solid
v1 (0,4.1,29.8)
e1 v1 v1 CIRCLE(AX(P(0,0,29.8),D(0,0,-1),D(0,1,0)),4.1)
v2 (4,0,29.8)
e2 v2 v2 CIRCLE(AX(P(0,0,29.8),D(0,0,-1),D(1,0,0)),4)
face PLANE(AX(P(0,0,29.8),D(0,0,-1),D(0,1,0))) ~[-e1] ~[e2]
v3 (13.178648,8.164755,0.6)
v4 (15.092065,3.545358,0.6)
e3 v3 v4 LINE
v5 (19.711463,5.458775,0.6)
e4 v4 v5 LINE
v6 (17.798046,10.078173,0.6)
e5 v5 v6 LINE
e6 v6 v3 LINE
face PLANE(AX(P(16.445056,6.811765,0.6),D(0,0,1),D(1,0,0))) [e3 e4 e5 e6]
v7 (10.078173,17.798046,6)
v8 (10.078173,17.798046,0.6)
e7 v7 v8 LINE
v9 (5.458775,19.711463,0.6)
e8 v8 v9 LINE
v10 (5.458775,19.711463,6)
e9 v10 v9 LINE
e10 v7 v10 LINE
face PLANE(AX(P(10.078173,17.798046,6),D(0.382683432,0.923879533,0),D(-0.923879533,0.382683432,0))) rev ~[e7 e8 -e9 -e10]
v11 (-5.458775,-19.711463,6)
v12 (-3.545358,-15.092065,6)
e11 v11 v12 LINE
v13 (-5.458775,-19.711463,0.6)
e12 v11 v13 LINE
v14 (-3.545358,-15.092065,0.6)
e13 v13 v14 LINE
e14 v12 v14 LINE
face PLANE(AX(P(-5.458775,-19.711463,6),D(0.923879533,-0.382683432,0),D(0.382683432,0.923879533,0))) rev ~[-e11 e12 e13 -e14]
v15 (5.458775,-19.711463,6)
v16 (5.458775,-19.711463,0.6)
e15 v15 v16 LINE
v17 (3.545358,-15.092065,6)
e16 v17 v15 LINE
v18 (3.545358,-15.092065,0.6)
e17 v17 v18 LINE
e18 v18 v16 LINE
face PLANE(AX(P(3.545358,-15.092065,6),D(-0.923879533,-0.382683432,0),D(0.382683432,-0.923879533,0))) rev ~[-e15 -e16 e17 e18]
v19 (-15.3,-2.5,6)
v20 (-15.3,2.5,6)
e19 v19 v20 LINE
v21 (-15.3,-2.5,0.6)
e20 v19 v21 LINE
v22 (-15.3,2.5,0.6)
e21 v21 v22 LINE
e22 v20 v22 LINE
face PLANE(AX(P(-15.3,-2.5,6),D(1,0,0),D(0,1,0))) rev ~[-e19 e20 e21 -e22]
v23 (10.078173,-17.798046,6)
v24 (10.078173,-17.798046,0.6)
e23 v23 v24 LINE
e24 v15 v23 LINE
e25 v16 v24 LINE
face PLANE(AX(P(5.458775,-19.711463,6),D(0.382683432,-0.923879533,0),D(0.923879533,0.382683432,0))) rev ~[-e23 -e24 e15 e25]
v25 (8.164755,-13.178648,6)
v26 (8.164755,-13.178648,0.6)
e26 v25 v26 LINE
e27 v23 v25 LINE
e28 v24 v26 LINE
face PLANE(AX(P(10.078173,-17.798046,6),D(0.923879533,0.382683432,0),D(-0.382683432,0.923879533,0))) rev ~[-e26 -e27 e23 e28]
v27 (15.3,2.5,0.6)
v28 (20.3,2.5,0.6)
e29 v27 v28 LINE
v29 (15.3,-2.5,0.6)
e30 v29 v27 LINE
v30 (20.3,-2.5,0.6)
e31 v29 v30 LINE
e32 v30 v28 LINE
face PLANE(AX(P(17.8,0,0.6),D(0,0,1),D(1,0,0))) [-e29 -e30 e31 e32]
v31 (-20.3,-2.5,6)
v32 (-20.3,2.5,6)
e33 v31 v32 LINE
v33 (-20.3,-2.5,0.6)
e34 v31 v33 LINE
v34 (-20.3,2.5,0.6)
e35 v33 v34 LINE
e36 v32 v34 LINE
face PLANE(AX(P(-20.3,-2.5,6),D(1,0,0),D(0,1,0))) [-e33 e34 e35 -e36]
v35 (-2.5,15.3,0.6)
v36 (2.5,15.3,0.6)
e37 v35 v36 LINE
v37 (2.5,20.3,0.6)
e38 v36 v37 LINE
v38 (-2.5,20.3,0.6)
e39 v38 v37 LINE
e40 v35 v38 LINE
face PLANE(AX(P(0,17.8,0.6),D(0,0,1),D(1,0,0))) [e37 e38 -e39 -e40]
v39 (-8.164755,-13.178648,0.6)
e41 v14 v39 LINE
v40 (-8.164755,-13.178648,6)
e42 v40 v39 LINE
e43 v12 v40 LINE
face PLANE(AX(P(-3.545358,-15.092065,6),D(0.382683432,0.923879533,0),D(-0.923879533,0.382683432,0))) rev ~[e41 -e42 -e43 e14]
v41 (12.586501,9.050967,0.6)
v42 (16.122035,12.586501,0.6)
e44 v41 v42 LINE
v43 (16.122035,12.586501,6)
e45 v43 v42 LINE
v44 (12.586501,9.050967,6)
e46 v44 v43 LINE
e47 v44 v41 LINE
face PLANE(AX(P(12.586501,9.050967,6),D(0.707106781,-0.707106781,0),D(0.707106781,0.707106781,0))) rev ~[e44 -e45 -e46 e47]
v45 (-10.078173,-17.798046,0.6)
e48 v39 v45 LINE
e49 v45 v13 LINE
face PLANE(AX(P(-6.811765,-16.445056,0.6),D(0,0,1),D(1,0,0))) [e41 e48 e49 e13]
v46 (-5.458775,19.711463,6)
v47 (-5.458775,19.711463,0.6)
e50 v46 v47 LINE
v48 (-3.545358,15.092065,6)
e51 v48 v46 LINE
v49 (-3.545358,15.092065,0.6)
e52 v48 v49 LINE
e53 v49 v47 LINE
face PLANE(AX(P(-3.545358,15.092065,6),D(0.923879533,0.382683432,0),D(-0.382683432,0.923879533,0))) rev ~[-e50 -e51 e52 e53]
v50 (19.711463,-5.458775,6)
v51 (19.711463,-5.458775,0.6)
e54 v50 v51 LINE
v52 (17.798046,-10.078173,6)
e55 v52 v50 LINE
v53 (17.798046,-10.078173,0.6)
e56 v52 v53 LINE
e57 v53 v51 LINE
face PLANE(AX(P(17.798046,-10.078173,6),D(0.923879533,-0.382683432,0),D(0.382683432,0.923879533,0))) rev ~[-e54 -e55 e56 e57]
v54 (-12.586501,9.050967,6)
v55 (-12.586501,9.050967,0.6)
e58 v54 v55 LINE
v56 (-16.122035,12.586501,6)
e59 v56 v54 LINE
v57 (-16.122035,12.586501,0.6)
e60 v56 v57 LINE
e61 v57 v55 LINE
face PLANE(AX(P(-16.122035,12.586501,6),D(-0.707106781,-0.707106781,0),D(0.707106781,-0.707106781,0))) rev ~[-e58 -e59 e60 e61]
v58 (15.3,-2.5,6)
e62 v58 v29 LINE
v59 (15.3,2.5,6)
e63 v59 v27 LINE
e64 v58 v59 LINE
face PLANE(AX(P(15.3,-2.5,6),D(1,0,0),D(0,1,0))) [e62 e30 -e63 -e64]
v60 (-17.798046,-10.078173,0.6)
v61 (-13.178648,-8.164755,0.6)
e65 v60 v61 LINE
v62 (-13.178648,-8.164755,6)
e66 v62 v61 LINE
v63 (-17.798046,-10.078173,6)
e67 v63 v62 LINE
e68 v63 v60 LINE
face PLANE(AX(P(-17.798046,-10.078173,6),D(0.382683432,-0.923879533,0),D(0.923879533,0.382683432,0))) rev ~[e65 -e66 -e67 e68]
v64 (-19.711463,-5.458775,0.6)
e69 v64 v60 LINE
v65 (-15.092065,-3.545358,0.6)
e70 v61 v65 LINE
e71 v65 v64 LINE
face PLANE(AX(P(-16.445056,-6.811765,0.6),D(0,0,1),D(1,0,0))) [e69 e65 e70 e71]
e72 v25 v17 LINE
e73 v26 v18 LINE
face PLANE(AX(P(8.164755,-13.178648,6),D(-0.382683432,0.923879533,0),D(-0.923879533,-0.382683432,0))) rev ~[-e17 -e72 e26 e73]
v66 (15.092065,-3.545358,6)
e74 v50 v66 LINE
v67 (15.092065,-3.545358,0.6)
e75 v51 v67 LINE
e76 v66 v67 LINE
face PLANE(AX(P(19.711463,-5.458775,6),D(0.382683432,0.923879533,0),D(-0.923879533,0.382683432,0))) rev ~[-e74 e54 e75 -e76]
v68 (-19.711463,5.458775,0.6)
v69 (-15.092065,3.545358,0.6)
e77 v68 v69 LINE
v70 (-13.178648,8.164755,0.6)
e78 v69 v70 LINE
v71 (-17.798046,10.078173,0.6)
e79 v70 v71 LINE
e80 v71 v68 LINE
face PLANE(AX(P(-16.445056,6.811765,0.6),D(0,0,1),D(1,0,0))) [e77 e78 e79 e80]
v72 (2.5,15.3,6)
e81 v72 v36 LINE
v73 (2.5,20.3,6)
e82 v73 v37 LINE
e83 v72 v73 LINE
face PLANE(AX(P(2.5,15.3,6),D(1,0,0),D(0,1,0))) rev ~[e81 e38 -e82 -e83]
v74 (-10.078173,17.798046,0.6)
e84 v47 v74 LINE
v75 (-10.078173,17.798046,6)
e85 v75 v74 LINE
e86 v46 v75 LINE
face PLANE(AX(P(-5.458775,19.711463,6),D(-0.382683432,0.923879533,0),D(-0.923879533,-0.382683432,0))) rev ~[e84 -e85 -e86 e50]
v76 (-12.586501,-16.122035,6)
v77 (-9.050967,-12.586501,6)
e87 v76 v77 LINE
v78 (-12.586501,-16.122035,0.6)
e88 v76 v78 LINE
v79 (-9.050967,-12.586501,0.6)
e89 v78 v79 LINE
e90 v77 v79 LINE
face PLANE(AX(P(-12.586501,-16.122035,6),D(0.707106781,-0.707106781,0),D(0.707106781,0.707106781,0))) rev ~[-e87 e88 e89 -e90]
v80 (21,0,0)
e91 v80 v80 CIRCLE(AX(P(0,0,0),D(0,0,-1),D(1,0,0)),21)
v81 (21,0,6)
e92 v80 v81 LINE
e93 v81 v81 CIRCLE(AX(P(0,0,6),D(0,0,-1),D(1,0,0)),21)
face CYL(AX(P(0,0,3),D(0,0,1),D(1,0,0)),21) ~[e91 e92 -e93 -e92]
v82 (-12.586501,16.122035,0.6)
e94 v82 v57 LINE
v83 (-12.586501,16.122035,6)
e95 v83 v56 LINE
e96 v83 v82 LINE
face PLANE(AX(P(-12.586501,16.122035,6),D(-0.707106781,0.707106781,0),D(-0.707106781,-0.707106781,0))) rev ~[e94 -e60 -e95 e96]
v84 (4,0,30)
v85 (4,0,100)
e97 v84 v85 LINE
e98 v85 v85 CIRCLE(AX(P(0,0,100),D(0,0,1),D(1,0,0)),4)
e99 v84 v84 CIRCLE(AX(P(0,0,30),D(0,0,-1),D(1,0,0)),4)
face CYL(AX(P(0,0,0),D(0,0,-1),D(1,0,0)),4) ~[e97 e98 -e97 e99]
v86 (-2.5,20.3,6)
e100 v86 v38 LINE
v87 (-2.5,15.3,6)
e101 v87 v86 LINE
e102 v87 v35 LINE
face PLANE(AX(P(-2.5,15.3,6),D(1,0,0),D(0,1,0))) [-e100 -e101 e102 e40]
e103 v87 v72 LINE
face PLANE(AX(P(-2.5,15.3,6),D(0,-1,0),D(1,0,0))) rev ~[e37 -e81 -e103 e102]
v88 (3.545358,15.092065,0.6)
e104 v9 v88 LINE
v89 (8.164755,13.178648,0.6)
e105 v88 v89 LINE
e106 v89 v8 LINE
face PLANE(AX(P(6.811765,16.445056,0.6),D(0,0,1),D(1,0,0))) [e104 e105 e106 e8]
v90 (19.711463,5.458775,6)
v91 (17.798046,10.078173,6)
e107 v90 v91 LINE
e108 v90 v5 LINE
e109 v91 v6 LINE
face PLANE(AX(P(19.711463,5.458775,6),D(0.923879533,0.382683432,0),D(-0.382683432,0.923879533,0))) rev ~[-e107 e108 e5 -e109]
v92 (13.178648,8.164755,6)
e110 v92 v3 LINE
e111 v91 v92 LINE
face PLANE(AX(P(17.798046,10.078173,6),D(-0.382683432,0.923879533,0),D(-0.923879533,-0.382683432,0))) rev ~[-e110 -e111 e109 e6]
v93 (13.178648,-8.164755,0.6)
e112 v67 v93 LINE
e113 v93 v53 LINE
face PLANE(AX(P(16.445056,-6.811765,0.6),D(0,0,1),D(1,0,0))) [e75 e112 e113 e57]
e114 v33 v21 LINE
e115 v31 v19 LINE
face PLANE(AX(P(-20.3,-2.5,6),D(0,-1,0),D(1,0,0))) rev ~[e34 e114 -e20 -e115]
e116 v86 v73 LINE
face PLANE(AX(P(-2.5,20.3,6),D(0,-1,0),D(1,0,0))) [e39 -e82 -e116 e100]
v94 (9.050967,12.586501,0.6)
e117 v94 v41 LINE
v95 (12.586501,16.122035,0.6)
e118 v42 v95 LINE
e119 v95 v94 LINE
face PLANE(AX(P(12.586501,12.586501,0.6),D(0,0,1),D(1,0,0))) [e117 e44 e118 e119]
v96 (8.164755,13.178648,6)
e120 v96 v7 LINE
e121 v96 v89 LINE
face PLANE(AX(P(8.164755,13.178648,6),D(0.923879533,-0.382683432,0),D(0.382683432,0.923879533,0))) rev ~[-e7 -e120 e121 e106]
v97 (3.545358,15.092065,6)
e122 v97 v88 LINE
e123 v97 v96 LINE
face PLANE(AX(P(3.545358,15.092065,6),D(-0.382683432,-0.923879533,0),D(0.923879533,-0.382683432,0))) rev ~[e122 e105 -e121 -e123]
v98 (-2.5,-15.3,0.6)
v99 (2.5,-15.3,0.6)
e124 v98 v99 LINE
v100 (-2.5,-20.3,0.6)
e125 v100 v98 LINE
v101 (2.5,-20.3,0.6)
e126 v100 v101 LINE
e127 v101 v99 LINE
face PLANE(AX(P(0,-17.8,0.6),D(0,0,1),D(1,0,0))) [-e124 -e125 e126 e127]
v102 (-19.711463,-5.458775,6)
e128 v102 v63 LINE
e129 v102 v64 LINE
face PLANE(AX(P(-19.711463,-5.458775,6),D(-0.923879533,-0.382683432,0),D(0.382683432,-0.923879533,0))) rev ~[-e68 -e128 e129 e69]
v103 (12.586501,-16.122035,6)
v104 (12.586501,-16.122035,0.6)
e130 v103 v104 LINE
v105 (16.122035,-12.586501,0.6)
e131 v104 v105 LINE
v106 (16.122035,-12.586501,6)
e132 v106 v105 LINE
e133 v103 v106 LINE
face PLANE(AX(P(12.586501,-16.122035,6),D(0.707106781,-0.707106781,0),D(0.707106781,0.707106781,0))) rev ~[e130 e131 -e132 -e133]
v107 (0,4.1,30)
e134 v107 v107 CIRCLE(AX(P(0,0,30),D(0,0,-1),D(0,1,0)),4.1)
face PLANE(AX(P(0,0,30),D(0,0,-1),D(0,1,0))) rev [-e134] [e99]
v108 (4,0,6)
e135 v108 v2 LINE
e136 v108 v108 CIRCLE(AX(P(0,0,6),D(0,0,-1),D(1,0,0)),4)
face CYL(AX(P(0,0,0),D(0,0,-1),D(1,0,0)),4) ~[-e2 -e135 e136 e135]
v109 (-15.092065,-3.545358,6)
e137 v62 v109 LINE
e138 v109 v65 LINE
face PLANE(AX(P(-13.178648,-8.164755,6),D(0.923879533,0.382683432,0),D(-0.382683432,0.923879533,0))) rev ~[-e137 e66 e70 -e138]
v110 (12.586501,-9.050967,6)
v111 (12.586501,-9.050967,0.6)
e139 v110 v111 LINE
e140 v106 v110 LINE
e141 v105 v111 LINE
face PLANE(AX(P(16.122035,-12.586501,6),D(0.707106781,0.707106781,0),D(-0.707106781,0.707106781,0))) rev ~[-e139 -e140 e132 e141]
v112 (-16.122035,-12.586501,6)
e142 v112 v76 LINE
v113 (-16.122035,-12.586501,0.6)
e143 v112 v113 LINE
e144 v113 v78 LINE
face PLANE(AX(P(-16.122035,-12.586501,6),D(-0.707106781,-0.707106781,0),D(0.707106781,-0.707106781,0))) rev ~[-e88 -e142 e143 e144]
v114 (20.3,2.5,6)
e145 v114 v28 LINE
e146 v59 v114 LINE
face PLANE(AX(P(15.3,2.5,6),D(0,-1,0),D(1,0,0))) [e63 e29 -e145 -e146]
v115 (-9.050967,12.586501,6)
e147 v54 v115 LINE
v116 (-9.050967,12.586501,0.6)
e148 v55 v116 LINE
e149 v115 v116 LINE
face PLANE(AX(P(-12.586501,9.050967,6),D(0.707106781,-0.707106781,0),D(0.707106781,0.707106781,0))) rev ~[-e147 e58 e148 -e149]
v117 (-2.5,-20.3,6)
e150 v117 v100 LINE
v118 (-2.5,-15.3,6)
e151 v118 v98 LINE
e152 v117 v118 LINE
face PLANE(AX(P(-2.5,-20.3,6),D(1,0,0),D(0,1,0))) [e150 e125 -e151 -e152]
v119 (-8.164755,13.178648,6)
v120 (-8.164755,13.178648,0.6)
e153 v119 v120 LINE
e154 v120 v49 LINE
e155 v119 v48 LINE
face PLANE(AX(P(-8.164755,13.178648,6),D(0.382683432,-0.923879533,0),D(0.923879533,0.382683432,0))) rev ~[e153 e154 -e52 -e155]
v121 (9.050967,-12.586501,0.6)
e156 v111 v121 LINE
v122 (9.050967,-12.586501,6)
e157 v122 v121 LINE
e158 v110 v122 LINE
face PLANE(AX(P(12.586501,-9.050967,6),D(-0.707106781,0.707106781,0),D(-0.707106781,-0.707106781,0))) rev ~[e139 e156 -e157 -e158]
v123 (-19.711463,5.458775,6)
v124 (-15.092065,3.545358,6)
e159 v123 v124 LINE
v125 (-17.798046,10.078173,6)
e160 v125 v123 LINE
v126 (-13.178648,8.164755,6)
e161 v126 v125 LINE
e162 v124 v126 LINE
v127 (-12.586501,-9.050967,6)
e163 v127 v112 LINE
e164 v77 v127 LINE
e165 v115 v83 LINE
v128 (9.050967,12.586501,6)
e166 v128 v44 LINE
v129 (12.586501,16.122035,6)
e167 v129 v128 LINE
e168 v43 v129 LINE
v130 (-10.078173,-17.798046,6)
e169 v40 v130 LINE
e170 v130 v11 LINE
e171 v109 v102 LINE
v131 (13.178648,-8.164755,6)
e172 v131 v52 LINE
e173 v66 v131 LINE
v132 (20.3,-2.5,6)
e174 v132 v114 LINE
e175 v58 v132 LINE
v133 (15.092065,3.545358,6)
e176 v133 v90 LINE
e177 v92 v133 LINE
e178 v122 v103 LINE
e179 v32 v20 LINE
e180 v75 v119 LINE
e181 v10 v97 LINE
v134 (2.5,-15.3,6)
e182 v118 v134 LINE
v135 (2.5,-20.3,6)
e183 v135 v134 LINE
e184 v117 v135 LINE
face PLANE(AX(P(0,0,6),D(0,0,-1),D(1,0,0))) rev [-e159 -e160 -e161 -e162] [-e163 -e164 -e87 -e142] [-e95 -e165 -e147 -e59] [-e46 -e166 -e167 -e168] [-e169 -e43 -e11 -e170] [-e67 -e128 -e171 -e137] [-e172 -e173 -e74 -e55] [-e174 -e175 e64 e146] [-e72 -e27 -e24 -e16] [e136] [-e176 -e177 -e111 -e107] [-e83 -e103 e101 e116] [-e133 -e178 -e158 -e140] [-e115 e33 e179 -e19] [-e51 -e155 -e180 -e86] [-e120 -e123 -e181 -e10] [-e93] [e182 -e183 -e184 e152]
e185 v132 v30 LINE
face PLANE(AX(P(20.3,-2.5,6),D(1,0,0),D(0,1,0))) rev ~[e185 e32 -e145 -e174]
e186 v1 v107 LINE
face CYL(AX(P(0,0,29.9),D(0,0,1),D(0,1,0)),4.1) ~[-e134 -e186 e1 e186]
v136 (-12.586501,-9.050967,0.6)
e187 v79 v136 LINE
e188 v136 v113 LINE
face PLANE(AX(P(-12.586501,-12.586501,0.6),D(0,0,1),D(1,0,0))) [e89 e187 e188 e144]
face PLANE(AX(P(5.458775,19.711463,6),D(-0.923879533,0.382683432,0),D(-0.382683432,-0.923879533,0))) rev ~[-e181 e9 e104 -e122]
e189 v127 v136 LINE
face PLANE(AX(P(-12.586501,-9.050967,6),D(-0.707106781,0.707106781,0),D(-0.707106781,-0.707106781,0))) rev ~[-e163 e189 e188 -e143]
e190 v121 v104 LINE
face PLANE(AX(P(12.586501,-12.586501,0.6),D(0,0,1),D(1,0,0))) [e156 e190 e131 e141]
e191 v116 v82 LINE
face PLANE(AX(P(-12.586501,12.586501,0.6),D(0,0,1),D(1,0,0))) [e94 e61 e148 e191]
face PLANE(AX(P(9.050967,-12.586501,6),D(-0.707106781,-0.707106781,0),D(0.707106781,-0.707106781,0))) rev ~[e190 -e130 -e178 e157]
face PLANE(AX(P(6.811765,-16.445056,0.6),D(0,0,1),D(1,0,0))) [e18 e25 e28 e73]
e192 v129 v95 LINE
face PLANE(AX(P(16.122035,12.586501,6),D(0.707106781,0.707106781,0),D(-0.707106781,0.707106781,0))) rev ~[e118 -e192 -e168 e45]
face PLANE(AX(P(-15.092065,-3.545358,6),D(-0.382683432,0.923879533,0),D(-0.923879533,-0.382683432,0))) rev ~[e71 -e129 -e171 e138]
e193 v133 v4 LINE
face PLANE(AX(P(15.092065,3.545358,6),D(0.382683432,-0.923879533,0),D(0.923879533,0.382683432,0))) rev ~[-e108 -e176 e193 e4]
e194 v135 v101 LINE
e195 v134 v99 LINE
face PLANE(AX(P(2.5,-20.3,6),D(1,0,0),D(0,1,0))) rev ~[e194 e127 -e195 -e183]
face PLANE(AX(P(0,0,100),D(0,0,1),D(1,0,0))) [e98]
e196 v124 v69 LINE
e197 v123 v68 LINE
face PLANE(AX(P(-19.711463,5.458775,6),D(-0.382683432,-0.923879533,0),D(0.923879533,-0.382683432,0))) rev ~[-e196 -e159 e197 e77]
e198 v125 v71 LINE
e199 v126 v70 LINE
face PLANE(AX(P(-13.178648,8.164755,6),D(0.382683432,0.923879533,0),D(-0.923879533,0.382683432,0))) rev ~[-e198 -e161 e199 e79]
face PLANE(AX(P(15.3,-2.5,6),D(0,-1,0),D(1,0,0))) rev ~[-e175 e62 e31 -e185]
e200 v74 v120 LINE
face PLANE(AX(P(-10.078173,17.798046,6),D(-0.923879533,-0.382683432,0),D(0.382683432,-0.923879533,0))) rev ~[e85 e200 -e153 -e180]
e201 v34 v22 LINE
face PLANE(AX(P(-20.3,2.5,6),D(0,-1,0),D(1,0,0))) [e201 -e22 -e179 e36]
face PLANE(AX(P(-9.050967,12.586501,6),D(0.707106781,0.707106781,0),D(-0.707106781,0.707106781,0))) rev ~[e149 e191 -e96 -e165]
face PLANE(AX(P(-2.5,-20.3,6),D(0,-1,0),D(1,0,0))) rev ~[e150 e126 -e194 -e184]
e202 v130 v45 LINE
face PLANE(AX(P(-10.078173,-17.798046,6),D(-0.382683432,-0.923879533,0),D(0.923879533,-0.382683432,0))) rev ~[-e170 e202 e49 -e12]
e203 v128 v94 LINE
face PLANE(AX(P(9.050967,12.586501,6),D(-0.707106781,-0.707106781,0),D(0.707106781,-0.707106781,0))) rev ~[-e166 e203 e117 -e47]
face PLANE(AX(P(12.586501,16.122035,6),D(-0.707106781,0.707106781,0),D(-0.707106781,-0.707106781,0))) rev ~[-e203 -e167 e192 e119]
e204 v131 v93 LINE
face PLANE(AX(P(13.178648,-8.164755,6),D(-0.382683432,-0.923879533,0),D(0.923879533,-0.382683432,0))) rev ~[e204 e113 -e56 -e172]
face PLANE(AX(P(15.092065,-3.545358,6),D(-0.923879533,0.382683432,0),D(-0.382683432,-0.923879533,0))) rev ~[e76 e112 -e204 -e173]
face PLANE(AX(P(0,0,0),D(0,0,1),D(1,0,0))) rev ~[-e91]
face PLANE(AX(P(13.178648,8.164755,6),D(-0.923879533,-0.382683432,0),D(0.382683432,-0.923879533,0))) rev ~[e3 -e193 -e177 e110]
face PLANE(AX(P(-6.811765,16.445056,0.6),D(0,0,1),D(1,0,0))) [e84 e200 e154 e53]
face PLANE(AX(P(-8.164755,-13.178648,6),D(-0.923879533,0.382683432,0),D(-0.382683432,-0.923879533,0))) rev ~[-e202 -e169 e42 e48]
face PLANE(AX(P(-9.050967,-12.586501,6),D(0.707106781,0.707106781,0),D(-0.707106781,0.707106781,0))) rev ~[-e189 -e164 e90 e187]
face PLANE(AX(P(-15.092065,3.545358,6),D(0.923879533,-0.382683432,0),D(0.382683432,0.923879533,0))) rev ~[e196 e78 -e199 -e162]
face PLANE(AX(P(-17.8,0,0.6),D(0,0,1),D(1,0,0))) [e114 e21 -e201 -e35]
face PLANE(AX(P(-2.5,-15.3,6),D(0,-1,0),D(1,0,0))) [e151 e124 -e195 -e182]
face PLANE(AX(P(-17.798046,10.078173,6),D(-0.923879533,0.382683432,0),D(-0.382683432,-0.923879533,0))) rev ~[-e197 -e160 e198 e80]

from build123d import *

# Parameters (mm, degrees)
F0_W     = 21
F0_H     = 6
F2_R     = 4
F3_DEPTH = 100
F4_W     = 5
F4_H     = 5
F5_DEPTH = 5.4
F6_W     = 4.1
F6_H     = 0.2


# Not quite as in the source:
# - a feature names something its author has since deleted; it is built from what else it names


with BuildPart() as f1:
    # F0 (on Front) → F1 (revolve)
    with BuildSketch(Plane.XZ):
        with Locations((10.5, 3)):
            Rectangle(F0_W, F0_H)
    revolve(axis=Axis((0, 0, 3), (0, 0, -1)))

    # F2 (on Top) → F3 (join)
    with BuildSketch(Plane.XY):
        Circle(F2_R)
    extrude(amount=F3_DEPTH)

    # F4 (on face) → F5 (cut)
    with BuildSketch(Plane.XY.offset(6)):
        with Locations((0, 17.8)):
            Rectangle(F4_W, F4_H)
        Polygon((-8.1647553465, 13.1786482665), (-3.5453576839, 15.0920654283), (-5.4587748457, 19.7114630909), (-10.0781725083, 17.7980459291), align=None)
        Polygon((3.5453576839, 15.0920654283), (8.1647553465, 13.1786482665), (10.0781725083, 17.7980459291), (5.4587748457, 19.7114630909), align=None)
        Polygon((9.0509667992, 12.5865007051), (12.5865007051, 9.0509667992), (16.1220346111, 12.5865007051), (12.5865007051, 16.1220346111), align=None)
        Polygon((13.1786482665, 8.1647553465), (15.0920654283, 3.5453576839), (19.7114630909, 5.4587748457), (17.7980459291, 10.0781725083), align=None)
        with Locations((17.8, 0)):
            Rectangle(F4_W, F4_H)
        Polygon((15.0920654283, -3.5453576839), (13.1786482665, -8.1647553465), (17.7980459291, -10.0781725083), (19.7114630909, -5.4587748457), align=None)
        Polygon((12.5865007051, -9.0509667992), (9.0509667992, -12.5865007051), (12.5865007051, -16.1220346111), (16.1220346111, -12.5865007051), align=None)
        Polygon((-12.5865007051, 9.0509667992), (-9.0509667992, 12.5865007051), (-12.5865007051, 16.1220346111), (-16.1220346111, 12.5865007051), align=None)
        Polygon((-15.0920654283, 3.5453576839), (-13.1786482665, 8.1647553465), (-17.7980459291, 10.0781725083), (-19.7114630909, 5.4587748457), align=None)
        with Locations((-17.8, 0)):
            Rectangle(F4_W, F4_H)
        Polygon((-13.1786482665, -8.1647553465), (-15.0920654283, -3.5453576839), (-19.7114630909, -5.4587748457), (-17.7980459291, -10.0781725083), align=None)
        Polygon((-9.0509667992, -12.5865007051), (-12.5865007051, -9.0509667992), (-16.1220346111, -12.5865007051), (-12.5865007051, -16.1220346111), align=None)
        Polygon((-3.5453576839, -15.0920654283), (-8.1647553465, -13.1786482665), (-10.0781725083, -17.7980459291), (-5.4587748457, -19.7114630909), align=None)
        with Locations((0, -17.8)):
            Rectangle(F4_W, F4_H)
        Polygon((8.1647553465, -13.1786482665), (3.5453576839, -15.0920654283), (5.4587748457, -19.7114630909), (10.0781725083, -17.7980459291), align=None)
    extrude(amount=-F5_DEPTH, mode=Mode.SUBTRACT)

    # F6 (on Right) → F7 (revolve)
    with BuildSketch(Plane.YZ):
        with Locations((2.05, 29.9)):
            Rectangle(F6_W, F6_H)
    revolve(axis=Axis((0, 0, 29.9), (0, 0, -1)))


solid = f1.part
